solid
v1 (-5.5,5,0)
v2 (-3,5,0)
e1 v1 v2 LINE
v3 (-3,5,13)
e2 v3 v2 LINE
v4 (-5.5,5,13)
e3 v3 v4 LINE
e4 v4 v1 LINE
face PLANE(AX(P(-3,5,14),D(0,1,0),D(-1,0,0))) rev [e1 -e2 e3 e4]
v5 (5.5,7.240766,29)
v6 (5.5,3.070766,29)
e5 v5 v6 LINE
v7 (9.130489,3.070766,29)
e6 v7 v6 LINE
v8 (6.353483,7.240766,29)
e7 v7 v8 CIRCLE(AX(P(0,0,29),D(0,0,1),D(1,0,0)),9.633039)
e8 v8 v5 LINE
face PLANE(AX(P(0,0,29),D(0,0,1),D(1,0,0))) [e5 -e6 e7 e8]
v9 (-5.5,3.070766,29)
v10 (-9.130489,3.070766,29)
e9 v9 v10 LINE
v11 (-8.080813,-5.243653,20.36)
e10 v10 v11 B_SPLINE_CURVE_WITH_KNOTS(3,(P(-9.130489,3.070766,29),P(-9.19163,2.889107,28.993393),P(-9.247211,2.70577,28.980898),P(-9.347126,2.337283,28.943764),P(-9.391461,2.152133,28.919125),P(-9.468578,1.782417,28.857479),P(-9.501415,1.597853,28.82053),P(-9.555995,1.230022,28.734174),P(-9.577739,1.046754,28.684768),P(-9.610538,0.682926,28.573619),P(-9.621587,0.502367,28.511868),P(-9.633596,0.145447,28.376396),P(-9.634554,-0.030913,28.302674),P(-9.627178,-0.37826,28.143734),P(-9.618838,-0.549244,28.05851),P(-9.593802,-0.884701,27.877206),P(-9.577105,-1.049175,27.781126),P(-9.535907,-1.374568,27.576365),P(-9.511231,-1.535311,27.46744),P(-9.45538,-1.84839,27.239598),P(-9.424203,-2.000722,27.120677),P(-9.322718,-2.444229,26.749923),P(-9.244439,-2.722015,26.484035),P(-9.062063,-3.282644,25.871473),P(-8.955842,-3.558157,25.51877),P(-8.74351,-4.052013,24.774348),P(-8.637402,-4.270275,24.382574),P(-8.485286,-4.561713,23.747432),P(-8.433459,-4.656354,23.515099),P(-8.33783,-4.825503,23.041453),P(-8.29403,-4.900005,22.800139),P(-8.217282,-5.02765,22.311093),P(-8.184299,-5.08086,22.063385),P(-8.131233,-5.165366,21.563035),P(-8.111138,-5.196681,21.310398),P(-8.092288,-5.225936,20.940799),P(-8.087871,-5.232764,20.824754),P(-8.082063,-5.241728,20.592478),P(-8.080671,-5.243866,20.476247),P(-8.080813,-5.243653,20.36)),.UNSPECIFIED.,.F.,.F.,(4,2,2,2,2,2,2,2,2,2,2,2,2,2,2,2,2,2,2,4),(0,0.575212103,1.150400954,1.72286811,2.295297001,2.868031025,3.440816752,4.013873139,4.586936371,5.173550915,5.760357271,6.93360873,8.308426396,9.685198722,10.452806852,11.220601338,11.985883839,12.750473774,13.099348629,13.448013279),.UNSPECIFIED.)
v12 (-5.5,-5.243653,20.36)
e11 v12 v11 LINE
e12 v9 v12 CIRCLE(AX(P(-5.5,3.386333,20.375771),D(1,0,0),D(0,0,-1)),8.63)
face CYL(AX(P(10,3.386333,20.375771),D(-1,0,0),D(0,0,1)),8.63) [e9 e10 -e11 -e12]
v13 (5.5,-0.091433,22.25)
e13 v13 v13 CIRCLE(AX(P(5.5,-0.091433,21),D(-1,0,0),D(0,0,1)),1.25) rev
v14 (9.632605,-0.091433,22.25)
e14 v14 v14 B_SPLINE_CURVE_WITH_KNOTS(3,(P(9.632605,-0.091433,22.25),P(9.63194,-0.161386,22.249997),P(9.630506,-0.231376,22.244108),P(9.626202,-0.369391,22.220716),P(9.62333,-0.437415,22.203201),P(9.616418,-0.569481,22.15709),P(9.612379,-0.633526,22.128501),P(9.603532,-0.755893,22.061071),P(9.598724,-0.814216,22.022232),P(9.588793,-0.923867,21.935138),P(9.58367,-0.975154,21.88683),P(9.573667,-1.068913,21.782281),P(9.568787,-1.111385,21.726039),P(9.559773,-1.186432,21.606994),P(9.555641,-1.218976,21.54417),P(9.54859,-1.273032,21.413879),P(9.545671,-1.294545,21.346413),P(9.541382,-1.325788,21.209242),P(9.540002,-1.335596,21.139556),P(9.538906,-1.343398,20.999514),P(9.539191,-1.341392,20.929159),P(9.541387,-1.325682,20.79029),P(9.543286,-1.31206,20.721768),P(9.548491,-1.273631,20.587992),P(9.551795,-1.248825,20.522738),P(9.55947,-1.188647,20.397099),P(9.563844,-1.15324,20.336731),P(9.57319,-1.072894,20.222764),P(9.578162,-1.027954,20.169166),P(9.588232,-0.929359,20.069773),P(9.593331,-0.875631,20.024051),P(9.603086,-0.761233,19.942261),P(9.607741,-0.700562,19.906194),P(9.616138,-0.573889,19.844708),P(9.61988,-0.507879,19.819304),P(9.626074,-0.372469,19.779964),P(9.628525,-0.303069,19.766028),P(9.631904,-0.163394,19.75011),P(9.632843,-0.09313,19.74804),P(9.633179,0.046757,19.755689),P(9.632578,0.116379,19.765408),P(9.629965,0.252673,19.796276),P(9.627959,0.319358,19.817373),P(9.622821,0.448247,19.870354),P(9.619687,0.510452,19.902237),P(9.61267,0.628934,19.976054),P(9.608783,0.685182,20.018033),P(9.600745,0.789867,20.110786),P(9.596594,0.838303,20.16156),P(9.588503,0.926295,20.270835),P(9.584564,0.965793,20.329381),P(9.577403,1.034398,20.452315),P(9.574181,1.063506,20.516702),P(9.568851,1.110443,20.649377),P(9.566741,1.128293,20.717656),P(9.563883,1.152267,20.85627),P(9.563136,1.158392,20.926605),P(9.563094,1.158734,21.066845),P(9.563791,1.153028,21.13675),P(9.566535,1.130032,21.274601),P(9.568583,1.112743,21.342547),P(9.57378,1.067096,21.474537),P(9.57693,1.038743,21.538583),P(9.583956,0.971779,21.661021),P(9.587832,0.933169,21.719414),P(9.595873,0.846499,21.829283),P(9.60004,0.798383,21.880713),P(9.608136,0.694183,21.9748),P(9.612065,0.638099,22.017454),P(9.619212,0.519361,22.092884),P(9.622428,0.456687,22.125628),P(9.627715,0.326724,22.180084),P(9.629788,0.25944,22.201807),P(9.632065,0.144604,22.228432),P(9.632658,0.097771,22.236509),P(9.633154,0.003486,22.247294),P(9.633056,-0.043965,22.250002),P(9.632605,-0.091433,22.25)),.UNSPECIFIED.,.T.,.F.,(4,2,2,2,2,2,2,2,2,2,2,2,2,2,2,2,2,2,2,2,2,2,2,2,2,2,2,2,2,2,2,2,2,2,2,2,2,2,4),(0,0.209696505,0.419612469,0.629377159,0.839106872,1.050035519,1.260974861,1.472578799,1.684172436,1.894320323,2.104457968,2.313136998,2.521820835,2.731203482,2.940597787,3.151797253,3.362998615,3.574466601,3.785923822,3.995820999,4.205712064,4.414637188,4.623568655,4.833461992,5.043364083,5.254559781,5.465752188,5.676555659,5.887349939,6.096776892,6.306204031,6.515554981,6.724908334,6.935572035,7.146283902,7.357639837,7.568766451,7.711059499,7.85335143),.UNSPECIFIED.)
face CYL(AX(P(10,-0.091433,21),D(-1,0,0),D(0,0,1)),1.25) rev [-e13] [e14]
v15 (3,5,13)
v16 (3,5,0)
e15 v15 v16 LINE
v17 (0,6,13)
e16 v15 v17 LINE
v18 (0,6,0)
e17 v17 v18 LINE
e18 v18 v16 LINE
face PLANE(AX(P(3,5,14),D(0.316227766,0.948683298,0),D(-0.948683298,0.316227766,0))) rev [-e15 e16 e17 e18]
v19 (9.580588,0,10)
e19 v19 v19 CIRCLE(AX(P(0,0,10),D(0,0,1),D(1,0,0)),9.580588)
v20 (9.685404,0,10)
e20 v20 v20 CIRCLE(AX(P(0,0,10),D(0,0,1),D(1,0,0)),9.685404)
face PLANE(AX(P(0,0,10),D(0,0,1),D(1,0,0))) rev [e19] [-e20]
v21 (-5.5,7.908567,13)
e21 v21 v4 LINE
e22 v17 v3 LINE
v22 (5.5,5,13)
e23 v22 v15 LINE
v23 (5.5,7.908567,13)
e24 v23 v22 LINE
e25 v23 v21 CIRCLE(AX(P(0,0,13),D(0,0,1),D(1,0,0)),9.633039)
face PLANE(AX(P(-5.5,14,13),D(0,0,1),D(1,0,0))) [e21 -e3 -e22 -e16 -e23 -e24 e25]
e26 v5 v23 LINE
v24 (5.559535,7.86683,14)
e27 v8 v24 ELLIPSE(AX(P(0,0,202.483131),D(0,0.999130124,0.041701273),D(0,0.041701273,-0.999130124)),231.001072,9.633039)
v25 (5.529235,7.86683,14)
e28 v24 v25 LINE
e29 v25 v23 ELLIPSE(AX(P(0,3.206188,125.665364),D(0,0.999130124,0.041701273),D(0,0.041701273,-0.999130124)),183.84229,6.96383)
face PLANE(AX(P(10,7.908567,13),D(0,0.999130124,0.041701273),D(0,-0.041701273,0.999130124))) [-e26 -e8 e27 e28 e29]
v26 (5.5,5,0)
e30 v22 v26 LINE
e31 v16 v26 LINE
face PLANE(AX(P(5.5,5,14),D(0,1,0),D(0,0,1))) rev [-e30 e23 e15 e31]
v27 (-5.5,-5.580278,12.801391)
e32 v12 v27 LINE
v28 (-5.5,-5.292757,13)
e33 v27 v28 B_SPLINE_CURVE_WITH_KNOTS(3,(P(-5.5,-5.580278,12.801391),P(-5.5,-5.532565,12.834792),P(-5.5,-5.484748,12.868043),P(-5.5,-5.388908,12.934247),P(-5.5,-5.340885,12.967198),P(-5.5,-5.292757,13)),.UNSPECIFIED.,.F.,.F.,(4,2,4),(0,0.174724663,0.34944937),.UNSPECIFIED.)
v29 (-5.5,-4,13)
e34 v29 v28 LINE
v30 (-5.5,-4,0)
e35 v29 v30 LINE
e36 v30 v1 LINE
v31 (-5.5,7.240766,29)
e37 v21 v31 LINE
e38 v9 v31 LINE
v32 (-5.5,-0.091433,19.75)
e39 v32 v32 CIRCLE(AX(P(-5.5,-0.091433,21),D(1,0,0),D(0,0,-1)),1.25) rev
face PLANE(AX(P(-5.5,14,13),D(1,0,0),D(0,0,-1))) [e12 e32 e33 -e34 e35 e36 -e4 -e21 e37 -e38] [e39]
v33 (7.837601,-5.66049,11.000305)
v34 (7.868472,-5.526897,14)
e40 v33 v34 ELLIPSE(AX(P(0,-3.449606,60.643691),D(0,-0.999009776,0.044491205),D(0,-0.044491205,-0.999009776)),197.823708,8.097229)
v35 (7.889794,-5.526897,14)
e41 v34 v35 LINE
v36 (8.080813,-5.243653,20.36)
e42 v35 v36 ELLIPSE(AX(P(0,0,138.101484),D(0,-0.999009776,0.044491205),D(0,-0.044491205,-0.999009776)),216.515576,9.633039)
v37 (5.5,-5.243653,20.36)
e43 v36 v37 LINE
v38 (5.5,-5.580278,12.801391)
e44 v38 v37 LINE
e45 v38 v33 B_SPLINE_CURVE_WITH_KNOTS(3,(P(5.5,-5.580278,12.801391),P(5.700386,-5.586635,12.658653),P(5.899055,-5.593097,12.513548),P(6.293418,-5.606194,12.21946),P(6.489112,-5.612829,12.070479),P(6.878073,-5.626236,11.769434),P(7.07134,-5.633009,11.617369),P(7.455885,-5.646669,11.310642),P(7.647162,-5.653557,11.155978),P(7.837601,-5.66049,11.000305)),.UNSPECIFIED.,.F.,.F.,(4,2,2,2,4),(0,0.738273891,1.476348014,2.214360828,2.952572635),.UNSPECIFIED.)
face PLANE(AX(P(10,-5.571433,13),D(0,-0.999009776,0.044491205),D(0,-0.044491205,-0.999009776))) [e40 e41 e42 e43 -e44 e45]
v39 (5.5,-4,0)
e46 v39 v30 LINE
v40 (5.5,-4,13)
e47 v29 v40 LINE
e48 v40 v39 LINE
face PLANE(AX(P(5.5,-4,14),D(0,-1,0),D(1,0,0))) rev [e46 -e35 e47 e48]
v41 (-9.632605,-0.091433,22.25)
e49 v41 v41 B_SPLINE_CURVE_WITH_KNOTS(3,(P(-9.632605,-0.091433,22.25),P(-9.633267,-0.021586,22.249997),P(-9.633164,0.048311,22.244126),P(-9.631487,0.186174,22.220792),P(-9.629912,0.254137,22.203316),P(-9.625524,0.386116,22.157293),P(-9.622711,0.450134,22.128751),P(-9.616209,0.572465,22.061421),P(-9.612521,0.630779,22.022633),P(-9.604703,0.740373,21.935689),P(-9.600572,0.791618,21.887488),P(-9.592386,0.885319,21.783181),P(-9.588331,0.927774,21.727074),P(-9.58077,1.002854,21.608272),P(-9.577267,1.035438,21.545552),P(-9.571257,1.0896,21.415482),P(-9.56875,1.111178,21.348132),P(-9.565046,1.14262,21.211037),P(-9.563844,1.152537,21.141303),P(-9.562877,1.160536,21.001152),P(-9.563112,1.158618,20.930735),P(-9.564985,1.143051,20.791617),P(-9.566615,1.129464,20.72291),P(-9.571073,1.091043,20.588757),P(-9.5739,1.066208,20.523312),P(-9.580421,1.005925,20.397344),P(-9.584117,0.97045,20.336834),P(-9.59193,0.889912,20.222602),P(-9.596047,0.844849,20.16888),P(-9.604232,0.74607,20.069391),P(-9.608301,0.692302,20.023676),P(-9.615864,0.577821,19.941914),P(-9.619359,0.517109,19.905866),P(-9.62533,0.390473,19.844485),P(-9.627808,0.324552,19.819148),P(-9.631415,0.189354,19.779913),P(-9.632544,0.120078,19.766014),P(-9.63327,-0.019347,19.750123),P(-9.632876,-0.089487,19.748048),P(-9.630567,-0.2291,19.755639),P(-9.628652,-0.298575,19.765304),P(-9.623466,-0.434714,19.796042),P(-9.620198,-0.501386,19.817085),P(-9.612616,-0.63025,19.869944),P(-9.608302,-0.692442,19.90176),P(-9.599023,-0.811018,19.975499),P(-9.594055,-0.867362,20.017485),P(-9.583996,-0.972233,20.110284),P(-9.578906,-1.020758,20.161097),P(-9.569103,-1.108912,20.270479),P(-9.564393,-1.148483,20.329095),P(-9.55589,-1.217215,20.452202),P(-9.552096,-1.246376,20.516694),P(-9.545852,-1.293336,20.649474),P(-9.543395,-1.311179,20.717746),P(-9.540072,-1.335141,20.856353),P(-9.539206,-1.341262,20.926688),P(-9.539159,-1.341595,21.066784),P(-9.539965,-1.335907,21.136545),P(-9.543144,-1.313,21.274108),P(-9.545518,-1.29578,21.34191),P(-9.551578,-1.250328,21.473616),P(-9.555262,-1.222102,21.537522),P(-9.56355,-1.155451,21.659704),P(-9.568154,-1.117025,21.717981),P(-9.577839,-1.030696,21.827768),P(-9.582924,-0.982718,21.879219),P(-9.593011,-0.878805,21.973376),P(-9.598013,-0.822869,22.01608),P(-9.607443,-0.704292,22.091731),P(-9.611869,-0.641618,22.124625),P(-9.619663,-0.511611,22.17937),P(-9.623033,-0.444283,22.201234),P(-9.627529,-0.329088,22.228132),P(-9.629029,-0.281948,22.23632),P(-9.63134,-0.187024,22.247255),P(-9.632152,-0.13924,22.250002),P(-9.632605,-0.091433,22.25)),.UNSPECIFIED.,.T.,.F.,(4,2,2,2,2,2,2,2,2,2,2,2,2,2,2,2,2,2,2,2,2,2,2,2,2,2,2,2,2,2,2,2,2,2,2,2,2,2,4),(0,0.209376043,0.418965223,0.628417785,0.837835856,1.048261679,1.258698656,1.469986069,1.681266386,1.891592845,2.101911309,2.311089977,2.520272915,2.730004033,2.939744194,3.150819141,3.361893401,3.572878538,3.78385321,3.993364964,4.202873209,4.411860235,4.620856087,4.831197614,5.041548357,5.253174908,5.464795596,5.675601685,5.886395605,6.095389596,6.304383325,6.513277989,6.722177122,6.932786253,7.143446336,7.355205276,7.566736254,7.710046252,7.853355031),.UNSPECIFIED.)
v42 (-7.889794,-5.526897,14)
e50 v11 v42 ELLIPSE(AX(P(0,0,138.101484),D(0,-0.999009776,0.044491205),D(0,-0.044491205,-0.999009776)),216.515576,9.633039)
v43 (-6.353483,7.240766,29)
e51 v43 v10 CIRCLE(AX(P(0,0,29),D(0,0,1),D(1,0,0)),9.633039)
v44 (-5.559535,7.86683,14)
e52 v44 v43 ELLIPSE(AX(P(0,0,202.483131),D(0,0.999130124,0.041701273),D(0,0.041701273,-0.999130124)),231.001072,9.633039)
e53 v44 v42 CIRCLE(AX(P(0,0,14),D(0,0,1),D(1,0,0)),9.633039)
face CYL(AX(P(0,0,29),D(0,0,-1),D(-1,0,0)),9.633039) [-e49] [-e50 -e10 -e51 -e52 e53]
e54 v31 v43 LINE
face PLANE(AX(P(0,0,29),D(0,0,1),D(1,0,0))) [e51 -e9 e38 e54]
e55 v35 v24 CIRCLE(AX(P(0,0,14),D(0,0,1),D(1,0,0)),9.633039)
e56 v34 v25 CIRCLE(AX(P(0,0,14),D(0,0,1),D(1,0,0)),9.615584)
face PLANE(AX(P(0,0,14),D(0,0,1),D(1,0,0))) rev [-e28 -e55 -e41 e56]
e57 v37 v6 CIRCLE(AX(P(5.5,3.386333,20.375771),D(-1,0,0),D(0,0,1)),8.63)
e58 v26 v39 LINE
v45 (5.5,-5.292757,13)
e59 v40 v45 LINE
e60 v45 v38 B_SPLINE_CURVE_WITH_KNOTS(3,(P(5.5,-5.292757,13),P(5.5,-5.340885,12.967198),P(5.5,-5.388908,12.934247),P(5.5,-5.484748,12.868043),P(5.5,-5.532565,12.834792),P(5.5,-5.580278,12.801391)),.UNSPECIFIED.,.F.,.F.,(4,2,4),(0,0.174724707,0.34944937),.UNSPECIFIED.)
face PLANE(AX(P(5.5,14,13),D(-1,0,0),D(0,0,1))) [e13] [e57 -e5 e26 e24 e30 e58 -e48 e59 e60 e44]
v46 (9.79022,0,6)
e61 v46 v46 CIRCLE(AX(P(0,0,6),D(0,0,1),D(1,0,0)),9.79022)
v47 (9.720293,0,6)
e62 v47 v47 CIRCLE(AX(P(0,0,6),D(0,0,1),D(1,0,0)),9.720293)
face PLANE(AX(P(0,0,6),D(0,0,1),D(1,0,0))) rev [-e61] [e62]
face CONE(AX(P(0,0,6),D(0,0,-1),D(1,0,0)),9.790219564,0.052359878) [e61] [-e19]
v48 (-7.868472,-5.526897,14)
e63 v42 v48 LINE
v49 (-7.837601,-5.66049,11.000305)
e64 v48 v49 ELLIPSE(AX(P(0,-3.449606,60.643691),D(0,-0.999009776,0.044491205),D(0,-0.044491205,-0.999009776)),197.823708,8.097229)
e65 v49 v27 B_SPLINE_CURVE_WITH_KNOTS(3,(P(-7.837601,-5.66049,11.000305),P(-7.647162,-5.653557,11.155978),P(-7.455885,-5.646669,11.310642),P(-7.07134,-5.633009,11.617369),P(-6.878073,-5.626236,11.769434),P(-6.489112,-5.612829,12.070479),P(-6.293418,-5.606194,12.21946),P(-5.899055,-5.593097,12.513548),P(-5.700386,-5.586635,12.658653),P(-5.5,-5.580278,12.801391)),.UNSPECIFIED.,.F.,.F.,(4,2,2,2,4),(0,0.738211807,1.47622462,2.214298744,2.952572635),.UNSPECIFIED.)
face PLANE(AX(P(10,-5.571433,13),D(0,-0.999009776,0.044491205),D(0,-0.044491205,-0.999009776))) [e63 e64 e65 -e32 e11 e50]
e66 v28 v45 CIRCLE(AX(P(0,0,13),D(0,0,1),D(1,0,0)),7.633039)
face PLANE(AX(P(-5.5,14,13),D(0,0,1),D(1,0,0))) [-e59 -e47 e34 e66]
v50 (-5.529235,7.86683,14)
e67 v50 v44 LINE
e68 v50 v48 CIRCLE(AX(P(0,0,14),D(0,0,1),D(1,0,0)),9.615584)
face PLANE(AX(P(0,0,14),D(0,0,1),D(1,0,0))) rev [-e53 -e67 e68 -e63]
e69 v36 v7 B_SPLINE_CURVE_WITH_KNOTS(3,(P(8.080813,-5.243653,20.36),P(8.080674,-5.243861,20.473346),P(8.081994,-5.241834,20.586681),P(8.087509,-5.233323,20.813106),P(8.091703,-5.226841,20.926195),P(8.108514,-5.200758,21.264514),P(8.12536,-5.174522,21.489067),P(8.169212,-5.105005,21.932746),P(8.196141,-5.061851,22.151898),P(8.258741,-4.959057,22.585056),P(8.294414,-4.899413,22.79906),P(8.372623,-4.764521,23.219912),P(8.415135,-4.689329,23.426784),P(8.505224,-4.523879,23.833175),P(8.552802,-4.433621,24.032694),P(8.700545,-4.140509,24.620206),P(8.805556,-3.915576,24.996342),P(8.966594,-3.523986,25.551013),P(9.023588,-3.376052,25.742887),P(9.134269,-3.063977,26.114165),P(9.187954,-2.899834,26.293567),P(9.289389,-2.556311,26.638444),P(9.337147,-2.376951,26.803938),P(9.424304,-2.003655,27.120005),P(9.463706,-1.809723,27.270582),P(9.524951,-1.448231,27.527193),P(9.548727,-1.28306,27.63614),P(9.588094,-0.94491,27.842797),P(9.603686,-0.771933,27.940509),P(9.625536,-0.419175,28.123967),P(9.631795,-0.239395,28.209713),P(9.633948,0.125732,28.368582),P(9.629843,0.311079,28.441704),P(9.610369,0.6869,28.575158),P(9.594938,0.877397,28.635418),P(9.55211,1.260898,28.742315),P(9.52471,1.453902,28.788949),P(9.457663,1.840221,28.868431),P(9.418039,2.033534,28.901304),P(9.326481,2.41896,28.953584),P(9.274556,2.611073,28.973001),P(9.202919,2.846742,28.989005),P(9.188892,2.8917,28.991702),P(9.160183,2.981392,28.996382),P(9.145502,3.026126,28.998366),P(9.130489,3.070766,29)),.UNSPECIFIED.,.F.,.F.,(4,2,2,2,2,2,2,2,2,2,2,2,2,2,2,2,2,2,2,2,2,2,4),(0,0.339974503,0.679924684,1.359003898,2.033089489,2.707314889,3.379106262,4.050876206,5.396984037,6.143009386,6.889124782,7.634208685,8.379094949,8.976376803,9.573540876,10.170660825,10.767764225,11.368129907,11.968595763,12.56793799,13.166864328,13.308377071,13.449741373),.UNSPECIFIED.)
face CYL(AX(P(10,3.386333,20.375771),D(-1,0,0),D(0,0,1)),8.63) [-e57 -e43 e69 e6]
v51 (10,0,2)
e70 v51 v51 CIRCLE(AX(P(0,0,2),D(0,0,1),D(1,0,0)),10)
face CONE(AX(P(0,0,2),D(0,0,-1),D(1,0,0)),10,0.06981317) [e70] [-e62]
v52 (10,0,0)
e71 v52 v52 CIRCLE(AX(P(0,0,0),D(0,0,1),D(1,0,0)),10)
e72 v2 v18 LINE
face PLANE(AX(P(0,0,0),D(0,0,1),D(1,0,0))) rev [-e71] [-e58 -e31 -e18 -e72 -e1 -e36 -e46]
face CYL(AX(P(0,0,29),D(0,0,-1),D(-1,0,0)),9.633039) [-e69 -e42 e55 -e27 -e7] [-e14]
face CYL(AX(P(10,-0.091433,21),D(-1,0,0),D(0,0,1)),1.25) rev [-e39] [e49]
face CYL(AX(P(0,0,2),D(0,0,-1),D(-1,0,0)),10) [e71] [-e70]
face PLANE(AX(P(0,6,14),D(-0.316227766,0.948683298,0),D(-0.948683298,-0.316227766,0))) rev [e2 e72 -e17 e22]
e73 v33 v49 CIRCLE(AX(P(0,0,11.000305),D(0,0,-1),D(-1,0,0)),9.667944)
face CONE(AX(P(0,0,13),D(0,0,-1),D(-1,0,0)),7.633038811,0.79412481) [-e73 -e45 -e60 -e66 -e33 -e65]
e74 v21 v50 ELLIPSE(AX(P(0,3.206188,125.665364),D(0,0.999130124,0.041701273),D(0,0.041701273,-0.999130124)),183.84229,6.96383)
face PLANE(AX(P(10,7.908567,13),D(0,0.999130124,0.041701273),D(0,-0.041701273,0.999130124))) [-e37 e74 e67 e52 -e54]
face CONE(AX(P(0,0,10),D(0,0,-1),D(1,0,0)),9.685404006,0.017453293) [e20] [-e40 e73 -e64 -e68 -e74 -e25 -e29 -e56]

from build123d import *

# Parameters (mm, degrees)
SKETCH2_R               = 10
BOSS_EXTRUDE1_DEPTH     = 2
SKETCH3_R               = 10
BOSS_EXTRUDE2_DEPTH     = 4
BOSS_EXTRUDE2_TAPER     = 4
SKETCH4_R               = 9.790219564
BOSS_EXTRUDE3_DEPTH     = 4
BOSS_EXTRUDE3_TAPER     = 3
SKETCH5_R               = 9.685404006
BOSS_EXTRUDE4_DEPTH     = 4
BOSS_EXTRUDE4_TAPER     = 1
SKETCH6_R               = 9.633038811
BOSS_EXTRUDE5_DEPTH     = 15
CUT_EXTRUDE1_DEPTH      = 14
CUT_EXTRUDE1_DEPTH_BACK = 14
SKETCH7_W               = 11
SKETCH7_H               = 17.89942169
CUT_EXTRUDE4_DEPTH      = 14
CUT_EXTRUDE5_DEPTH      = 10
CUT_EXTRUDE5_DEPTH_BACK = 10
CHAMFER1_SIZE           = 2
CUT_EXTRUDE6_DEPTH      = 10
CUT_EXTRUDE6_DEPTH_BACK = 10
SKETCH11_R              = 1.25


with BuildPart() as part:
    # Sketch2 → Boss-Extrude1 (new body)
    with BuildSketch(Plane.XY):
        Circle(SKETCH2_R)
    extrude(amount=BOSS_EXTRUDE1_DEPTH)

    # Sketch3 → Boss-Extrude2 (add)
    with BuildSketch(Plane.XY.offset(2)):
        Circle(SKETCH3_R)
    extrude(amount=BOSS_EXTRUDE2_DEPTH, taper=BOSS_EXTRUDE2_TAPER)

    # Sketch4 → Boss-Extrude3 (add)
    with BuildSketch(Plane.XY.offset(6)):
        Circle(SKETCH4_R)
    extrude(amount=BOSS_EXTRUDE3_DEPTH, taper=BOSS_EXTRUDE3_TAPER)

    # Sketch5 → Boss-Extrude4 (add)
    with BuildSketch(Plane.XY.offset(10)):
        Circle(SKETCH5_R)
    extrude(amount=BOSS_EXTRUDE4_DEPTH, taper=BOSS_EXTRUDE4_TAPER)

    # Sketch6 → Boss-Extrude5 (add)
    with BuildSketch(Plane.XY.offset(14)):
        Circle(SKETCH6_R)
    extrude(amount=BOSS_EXTRUDE5_DEPTH)

    # Sketch7 → Cut-Extrude1 (cut, two sides: drawn at the far end of the back side and taken through both)
    with BuildSketch(Plane(origin=(0, 0, 0), x_dir=(1, 0, 0), z_dir=(0, 1, 0)).offset(-CUT_EXTRUDE1_DEPTH_BACK)):
        with Locations((0, -21.949710845)):
            Rectangle(SKETCH7_W, SKETCH7_H)
    extrude(amount=CUT_EXTRUDE1_DEPTH + CUT_EXTRUDE1_DEPTH_BACK, mode=Mode.SUBTRACT)

    # Sketch10 → Cut-Extrude4 (cut)
    with BuildSketch(Plane(origin=(0, 0, 0), x_dir=(-1, 0, 0), z_dir=(0, 0, -1))):
        Polygon((-5.5, 5), (-5.5, -4), (5.5, -4), (5.5, 5), (3, 5), (0, 6), (-3, 5), align=None)
    extrude(amount=-CUT_EXTRUDE4_DEPTH, mode=Mode.SUBTRACT)

    # Sketch8 → Cut-Extrude5 (cut, two sides: drawn at the far end of the back side and taken through both)
    with BuildSketch(Plane(origin=(0, 0, 0), x_dir=(0, 0, -1), z_dir=(1, 0, 0)).offset(-CUT_EXTRUDE5_DEPTH_BACK)):
        with BuildLine():
            Line((-13, 9.633038811), (-13, 7.9085673))
            Line((-13, 7.9085673), (-29, 7.240766023))
            Line((-29, 7.240766023), (-29, 3.070766023))
            ThreePointArc((-29, 3.070766023), (-26.359814718, -2.832037351), (-20.36, -5.243652859))
            Line((-20.36, -5.243652859), (-13, -5.5714327))
            Line((-13, -5.5714327), (-13, -9.633038811))
            Line((-13, -9.633038811), (-33.781866843, -9.633038811))
            Line((-33.781866843, -9.633038811), (-33.781866843, 9.633038811))
            Line((-33.781866843, 9.633038811), (-13, 9.633038811))
        make_face()
    extrude(amount=CUT_EXTRUDE5_DEPTH + CUT_EXTRUDE5_DEPTH_BACK, mode=Mode.SUBTRACT)

    # Chamfer1
    # the kernel refuses this chamfer: 2 mm, written as the material it takes off along each edge
    with BuildSketch(Plane(origin=(0, 0, 13), x_dir=(0.9966107214684086, -0.08226220185612716, 1.2908177907304536e-15), z_dir=(0.08226220185612716, 0.9966107214684086, 1.0371882149808466e-15))) as chamfer1_piece_1_section:
        Polygon((9.633038811 + CHAMFER1_SIZE * 0.0174524064373, CHAMFER1_SIZE * 0.999847695156), (9.633038811 - CHAMFER1_SIZE, 0), (9.633038811, 0), align=None)
    chamfer1_piece_1 = revolve(axis=Axis((0, 0, 13), (0, 0, -1)), revolution_arc=170.562781842, mode=Mode.PRIVATE)
    chamfer1_piece_1 = split(chamfer1_piece_1, bisect_by=Plane(origin=(-5.5, -5.504615156, 12.950413225), z_dir=(1, 0, 0)), keep=Keep.TOP, mode=Mode.PRIVATE)
    chamfer1_piece_1 = split(chamfer1_piece_1, bisect_by=Plane(origin=(5.5, -5.504615156, 12.950413225), z_dir=(-1, 0, 0)), keep=Keep.TOP, mode=Mode.PRIVATE)
    add(chamfer1_piece_1, mode=Mode.SUBTRACT)
    with BuildSketch(Plane(origin=(0, 0, 13), x_dir=(0.9966107214684086, -0.08226220185612716, 1.2908177907304536e-15), z_dir=(0.08226220185612716, 0.9966107214684086, 1.0371882149808466e-15))) as chamfer1_piece_2_section:
        Polygon((9.633038811 + CHAMFER1_SIZE * 0.0174524064373, CHAMFER1_SIZE * 0.999847695156), (9.633038811 - CHAMFER1_SIZE, 0), (9.633038811, 0), align=None)
    chamfer1_piece_2 = revolve(axis=Axis((0, 0, 13), (0, 0, -1)), revolution_arc=170.562781842, mode=Mode.PRIVATE)
    chamfer1_piece_2 = split(chamfer1_piece_2, bisect_by=Plane(origin=(6.416338432, -5.607046409, 12.200326364), z_dir=(0, -0.9990097760809877, 0.04449120468828483)), keep=Keep.TOP, mode=Mode.PRIVATE)
    add(chamfer1_piece_2, mode=Mode.SUBTRACT)

    # Sketch11 → Cut-Extrude6 (cut, two sides: drawn at the far end of the back side and taken through both)
    with BuildSketch(Plane(origin=(0, 0, 0), x_dir=(0, 0, -1), z_dir=(1, 0, 0)).offset(-CUT_EXTRUDE6_DEPTH_BACK)):
        with Locations(Location((-21, -0.0914327, 0), (0, 0, 180))):
            Circle(SKETCH11_R)
    extrude(amount=CUT_EXTRUDE6_DEPTH + CUT_EXTRUDE6_DEPTH_BACK, mode=Mode.SUBTRACT)


solid = part.part
